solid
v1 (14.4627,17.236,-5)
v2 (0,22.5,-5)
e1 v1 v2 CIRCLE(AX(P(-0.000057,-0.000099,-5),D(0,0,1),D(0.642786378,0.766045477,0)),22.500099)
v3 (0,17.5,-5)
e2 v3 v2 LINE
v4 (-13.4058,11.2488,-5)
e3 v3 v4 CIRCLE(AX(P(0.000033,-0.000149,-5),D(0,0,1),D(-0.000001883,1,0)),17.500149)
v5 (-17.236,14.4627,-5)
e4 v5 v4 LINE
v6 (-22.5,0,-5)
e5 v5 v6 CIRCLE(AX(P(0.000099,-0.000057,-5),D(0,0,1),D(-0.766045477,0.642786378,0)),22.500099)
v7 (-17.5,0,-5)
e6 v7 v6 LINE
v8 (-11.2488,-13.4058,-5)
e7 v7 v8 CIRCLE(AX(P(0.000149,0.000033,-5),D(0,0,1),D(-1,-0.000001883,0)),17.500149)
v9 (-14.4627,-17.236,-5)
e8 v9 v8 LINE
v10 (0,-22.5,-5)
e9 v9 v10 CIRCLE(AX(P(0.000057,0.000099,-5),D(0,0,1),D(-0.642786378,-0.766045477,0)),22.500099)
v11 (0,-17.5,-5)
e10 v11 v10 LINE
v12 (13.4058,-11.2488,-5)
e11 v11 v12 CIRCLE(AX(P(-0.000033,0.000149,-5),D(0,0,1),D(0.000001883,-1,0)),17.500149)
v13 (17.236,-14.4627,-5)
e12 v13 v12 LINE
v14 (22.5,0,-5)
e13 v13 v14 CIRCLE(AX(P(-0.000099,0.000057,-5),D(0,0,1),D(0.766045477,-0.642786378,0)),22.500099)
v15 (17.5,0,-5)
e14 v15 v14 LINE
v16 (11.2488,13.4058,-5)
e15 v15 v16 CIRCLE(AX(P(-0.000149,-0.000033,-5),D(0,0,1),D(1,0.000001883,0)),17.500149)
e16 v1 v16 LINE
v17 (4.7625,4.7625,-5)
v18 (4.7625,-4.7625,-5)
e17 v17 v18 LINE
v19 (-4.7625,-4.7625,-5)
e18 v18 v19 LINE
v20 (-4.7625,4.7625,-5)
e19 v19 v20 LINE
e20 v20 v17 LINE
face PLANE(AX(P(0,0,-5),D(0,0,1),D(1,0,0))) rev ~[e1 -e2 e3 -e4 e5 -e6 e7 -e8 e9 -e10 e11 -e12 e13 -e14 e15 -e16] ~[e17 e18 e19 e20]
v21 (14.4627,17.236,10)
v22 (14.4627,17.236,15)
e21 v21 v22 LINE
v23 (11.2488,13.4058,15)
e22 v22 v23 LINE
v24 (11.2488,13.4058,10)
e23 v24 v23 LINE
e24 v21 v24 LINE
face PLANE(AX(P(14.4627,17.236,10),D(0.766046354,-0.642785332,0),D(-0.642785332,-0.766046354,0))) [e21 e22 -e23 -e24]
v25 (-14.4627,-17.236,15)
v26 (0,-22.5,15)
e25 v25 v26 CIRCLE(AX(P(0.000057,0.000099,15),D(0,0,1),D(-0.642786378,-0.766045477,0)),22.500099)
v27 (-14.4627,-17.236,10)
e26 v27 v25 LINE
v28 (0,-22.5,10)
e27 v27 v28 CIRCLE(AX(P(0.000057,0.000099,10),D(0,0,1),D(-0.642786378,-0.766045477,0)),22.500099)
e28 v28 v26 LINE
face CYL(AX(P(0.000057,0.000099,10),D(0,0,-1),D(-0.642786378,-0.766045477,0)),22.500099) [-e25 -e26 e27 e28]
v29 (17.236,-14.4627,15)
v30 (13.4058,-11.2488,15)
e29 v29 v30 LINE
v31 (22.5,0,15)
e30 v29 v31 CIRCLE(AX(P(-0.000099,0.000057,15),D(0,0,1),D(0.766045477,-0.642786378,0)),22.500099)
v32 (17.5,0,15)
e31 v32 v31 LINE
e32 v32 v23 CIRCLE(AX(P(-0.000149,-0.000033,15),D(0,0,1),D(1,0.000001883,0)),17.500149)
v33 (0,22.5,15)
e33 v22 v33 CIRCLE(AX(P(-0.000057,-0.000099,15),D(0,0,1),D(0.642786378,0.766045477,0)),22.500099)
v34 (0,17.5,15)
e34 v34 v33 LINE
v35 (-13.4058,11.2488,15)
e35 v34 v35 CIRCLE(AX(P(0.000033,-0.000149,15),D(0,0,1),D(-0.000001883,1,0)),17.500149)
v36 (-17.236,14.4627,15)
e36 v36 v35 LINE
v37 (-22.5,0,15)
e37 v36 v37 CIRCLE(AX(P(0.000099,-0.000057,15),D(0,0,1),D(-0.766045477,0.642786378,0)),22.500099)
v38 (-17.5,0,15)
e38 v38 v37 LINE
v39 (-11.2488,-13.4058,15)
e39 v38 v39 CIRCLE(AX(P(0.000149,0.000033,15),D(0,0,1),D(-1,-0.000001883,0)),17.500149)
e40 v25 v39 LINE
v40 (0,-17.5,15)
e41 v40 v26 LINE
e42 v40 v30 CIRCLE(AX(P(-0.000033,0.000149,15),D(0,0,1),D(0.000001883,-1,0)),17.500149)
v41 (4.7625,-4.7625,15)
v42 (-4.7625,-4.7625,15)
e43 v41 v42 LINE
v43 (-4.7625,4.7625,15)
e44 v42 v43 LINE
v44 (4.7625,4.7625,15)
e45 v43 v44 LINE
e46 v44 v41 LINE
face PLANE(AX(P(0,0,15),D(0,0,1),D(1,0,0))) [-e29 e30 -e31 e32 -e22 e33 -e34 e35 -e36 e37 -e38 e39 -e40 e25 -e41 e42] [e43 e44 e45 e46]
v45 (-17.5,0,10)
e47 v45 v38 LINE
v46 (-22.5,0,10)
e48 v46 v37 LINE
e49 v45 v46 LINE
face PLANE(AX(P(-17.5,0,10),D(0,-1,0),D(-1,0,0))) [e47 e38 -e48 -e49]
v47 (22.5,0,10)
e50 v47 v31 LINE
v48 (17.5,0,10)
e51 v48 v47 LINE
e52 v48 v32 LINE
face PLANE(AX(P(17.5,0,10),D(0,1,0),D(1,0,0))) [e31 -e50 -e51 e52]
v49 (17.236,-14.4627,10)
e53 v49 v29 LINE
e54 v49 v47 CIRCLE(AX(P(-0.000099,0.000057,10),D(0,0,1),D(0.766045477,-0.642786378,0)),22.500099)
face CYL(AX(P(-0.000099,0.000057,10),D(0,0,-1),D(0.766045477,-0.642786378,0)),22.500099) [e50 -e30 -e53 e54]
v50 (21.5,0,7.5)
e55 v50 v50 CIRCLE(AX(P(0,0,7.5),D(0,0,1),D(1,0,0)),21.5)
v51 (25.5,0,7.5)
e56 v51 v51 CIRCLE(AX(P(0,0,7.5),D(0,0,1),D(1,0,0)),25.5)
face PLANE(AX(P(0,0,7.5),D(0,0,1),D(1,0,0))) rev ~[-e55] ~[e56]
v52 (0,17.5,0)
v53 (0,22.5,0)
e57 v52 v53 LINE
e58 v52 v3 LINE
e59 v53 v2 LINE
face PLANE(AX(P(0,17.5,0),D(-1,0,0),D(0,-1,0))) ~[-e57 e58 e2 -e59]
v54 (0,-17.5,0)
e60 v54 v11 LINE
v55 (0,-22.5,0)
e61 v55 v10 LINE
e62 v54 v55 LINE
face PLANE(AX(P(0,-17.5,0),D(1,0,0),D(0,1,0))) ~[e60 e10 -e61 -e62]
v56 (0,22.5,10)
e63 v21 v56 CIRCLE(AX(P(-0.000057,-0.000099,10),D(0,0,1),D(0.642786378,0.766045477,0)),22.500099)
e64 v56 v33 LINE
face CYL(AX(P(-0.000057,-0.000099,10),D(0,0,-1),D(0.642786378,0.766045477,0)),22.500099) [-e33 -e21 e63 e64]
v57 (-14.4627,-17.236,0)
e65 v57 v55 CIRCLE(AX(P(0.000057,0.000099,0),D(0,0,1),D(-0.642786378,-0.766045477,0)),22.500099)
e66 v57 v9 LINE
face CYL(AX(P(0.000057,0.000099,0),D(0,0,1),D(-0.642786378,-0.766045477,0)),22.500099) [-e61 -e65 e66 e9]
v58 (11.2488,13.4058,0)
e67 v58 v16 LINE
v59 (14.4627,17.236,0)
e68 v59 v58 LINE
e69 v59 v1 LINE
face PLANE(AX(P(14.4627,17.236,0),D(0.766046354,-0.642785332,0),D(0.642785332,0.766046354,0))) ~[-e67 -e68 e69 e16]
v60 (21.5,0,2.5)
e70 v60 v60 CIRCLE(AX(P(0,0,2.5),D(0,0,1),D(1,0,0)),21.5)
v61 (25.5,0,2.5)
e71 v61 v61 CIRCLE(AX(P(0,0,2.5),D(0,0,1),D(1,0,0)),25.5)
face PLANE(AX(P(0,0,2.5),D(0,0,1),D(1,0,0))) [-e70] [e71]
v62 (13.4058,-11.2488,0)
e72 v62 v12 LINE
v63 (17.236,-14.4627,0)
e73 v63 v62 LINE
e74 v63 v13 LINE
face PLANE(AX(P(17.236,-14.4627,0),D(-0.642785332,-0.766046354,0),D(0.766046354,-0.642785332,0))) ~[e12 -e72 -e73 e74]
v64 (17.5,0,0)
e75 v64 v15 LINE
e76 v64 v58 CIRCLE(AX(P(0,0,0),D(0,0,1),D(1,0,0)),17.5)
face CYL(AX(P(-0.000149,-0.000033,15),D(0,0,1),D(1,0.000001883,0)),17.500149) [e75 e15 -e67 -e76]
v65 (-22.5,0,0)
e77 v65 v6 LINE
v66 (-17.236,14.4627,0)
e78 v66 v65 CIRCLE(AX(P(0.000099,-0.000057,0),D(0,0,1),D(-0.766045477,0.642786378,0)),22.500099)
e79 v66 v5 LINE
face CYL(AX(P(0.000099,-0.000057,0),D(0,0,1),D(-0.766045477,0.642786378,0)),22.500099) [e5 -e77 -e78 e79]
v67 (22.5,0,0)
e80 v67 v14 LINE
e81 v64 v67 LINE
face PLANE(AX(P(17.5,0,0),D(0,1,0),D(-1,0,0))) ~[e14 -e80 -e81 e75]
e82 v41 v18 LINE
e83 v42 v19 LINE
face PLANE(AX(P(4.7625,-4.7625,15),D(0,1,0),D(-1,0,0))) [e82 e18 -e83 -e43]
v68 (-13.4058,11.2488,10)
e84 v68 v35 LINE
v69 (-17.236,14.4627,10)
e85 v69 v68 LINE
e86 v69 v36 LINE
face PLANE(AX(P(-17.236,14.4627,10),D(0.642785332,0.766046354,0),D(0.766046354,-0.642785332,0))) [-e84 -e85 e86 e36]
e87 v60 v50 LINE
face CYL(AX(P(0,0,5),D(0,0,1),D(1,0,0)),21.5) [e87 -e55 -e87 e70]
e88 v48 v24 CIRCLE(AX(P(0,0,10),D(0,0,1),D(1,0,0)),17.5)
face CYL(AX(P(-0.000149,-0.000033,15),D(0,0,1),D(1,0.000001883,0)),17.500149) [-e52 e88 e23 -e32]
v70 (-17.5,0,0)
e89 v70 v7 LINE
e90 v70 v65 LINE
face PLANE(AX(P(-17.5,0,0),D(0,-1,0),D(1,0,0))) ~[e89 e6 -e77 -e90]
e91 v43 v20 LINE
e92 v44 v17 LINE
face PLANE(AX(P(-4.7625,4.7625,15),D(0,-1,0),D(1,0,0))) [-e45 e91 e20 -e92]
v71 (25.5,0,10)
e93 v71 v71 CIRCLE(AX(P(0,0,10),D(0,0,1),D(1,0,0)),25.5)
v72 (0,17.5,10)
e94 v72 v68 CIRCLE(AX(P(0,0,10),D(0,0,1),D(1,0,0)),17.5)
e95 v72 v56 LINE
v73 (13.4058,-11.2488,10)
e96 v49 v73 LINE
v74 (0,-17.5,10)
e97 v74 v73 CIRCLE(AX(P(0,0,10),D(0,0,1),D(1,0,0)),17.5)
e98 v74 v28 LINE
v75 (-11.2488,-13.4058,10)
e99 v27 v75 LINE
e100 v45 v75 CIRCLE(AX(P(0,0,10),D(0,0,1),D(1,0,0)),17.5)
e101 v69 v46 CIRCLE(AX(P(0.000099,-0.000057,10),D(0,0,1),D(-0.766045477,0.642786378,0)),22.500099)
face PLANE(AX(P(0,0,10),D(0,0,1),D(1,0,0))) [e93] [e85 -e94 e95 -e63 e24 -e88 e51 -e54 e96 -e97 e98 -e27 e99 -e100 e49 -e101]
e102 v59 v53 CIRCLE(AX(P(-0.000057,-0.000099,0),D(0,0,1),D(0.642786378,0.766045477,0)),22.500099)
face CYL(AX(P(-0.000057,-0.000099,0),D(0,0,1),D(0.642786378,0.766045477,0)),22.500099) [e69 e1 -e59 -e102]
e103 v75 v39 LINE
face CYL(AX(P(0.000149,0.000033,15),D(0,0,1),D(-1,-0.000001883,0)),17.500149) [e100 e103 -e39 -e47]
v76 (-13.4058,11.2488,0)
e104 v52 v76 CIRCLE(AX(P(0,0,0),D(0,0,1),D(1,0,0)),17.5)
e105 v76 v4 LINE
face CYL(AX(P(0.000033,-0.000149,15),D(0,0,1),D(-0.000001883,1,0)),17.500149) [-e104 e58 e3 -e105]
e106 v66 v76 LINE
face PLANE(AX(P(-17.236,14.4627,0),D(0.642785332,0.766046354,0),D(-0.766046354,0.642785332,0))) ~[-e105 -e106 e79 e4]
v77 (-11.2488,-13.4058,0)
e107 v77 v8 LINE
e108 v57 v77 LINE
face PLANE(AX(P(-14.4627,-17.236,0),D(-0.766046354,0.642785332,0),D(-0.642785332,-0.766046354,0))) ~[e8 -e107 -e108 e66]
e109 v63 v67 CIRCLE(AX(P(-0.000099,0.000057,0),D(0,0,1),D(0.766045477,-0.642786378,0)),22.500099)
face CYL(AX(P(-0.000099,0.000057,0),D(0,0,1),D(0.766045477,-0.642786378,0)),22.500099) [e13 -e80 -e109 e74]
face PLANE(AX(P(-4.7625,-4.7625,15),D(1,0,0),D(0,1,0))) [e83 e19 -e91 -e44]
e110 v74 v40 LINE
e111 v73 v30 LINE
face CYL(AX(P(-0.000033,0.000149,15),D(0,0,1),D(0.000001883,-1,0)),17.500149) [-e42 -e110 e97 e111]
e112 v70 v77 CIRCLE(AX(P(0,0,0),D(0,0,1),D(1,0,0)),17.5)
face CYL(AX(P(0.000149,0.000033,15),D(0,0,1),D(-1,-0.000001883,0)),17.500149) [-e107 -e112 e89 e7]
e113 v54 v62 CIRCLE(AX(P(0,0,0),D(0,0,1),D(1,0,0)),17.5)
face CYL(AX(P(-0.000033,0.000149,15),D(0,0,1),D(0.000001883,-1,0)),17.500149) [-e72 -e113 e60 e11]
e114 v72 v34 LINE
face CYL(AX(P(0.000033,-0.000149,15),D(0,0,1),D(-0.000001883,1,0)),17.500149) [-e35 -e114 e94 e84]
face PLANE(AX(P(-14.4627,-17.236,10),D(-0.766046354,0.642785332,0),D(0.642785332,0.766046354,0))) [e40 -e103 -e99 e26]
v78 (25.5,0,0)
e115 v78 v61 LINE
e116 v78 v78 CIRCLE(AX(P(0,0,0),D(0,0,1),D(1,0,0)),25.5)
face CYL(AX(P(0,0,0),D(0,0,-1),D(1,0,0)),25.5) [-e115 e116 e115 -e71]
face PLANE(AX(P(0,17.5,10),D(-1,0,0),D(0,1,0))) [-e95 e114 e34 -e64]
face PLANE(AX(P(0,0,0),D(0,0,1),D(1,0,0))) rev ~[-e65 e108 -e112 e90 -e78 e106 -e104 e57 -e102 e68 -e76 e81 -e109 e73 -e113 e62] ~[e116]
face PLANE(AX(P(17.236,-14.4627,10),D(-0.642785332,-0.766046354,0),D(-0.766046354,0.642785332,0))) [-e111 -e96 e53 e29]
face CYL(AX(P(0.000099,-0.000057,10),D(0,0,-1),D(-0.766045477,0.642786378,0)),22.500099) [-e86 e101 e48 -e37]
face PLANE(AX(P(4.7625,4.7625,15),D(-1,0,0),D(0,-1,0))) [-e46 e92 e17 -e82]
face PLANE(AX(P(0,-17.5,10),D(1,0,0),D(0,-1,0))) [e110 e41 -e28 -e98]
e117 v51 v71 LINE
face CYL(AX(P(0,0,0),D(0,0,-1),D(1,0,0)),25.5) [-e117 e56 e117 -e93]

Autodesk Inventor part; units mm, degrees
ref_plane "YZ Plane" through (0, 0, 0) normal (1, 0, 0) x (0, 1, 0)
ref_plane "XZ Plane" through (0, 0, 0) normal (0, 1, 0) x (-1, 0, 0)
sketch "Sketch1" plane through (0, 0, 0) normal (0, 0, 1) x (1, 0, 0)
  circle A0 centre (0, 0) radius 17.5
  circle A1 centre (0, 0) radius 25.5
  dimension "d0" = 35
  dimension "d1" = 8
extrude "Extrusion1" add sketch "Sketch1" along normal blind 10
ref_plane "Work Plane1" through (0, 0, 5) normal (0, 0, 1) x (1, 0, 0)
sketch "Sketch2" plane through (0, 0, 5) normal (0, 0, 1) x (1, 0, 0)
  circle A0 centre (0, 0) radius 25.5 projected
  circle A1 centre (0, 0) radius 21.5
  dimension "d4" = 4
extrude "Extrusion2" cut sketch "Sketch2" along normal mid plane 5
sketch "Sketch3" plane through (0, 0, 10) normal (0, 0, 1) x (1, 0, 0)
  circle A0 centre (0, 0) radius 17.5 construction
  line L0 (0, 0) -> (0, 17.5) construction
  line L1 (0, 17.5) -> (0, 22.5)
  arc A1 (14.4627, 17.236) -> (0, 22.5) centre (0, 0) ccw
  arc A2 (11.2488, 13.4058) -> (0, 17.5) centre (0, 0) ccw
  line L2 (14.4627, 17.236) -> (11.2488, 13.4058)
  dimension "d7" = 5
  dimension "d8" = 40
extrude "Extrusion3" add sketch "Sketch3" along normal blind 5
pattern_circular "Circular Pattern1" count 4 over 360 about axis through (0, 0, 0) along (0, 0, 1) of "Extrusion3"
mirror "Mirror1" about plane through (0, 0, 5) normal (0, 0, 1) of "Extrusion3", "Circular Pattern1"
sketch "Sketch4" plane through (0, 0, 10) normal (0, 0, 1) x (1, 0, 0)
  arc A0 (17.5, 0) -> (11.2488, 13.4058) centre (0, 0) ccw projected
  arc A1 (11.2488, 13.4058) -> (0, 17.5) centre (0, 0) ccw projected
  arc A2 (0, 17.5) -> (-13.4058, 11.2488) centre (0, 0) ccw projected
  arc A3 (-13.4058, 11.2488) -> (-17.5, 0) centre (0, 0) ccw projected
  arc A4 (-17.5, 0) -> (-11.2488, -13.4058) centre (0, 0) ccw projected
  arc A5 (-11.2488, -13.4058) -> (0, -17.5) centre (0, 0) ccw projected
  arc A6 (0, -17.5) -> (13.4058, -11.2488) centre (0, 0) ccw projected
  arc A7 (13.4058, -11.2488) -> (17.5, 0) centre (0, 0) ccw projected
  line L0 (4.7625, -4.7625) -> (-4.7625, -4.7625)
  line L1 (-4.7625, -4.7625) -> (-4.7625, 4.7625)
  line L2 (-4.7625, 4.7625) -> (4.7625, 4.7625)
  line L3 (4.7625, 4.7625) -> (4.7625, -4.7625)
  line L4 (4.7625, -4.7625) -> (-4.7625, 4.7625) construction
  line L5 (-4.7625, -4.7625) -> (4.7625, 4.7625) construction
  arc A8 (0, 17.5) -> (-13.4058, 11.2488) centre (0, 0) ccw projected
  circle A9 centre (0, 0) radius 17.5
  dimension "d14" = 9.525
extrude "Extrusion4" add sketch "Sketch4" against normal up to surface (20 mm away) from surface at 5
properties part number "dog clutch"
